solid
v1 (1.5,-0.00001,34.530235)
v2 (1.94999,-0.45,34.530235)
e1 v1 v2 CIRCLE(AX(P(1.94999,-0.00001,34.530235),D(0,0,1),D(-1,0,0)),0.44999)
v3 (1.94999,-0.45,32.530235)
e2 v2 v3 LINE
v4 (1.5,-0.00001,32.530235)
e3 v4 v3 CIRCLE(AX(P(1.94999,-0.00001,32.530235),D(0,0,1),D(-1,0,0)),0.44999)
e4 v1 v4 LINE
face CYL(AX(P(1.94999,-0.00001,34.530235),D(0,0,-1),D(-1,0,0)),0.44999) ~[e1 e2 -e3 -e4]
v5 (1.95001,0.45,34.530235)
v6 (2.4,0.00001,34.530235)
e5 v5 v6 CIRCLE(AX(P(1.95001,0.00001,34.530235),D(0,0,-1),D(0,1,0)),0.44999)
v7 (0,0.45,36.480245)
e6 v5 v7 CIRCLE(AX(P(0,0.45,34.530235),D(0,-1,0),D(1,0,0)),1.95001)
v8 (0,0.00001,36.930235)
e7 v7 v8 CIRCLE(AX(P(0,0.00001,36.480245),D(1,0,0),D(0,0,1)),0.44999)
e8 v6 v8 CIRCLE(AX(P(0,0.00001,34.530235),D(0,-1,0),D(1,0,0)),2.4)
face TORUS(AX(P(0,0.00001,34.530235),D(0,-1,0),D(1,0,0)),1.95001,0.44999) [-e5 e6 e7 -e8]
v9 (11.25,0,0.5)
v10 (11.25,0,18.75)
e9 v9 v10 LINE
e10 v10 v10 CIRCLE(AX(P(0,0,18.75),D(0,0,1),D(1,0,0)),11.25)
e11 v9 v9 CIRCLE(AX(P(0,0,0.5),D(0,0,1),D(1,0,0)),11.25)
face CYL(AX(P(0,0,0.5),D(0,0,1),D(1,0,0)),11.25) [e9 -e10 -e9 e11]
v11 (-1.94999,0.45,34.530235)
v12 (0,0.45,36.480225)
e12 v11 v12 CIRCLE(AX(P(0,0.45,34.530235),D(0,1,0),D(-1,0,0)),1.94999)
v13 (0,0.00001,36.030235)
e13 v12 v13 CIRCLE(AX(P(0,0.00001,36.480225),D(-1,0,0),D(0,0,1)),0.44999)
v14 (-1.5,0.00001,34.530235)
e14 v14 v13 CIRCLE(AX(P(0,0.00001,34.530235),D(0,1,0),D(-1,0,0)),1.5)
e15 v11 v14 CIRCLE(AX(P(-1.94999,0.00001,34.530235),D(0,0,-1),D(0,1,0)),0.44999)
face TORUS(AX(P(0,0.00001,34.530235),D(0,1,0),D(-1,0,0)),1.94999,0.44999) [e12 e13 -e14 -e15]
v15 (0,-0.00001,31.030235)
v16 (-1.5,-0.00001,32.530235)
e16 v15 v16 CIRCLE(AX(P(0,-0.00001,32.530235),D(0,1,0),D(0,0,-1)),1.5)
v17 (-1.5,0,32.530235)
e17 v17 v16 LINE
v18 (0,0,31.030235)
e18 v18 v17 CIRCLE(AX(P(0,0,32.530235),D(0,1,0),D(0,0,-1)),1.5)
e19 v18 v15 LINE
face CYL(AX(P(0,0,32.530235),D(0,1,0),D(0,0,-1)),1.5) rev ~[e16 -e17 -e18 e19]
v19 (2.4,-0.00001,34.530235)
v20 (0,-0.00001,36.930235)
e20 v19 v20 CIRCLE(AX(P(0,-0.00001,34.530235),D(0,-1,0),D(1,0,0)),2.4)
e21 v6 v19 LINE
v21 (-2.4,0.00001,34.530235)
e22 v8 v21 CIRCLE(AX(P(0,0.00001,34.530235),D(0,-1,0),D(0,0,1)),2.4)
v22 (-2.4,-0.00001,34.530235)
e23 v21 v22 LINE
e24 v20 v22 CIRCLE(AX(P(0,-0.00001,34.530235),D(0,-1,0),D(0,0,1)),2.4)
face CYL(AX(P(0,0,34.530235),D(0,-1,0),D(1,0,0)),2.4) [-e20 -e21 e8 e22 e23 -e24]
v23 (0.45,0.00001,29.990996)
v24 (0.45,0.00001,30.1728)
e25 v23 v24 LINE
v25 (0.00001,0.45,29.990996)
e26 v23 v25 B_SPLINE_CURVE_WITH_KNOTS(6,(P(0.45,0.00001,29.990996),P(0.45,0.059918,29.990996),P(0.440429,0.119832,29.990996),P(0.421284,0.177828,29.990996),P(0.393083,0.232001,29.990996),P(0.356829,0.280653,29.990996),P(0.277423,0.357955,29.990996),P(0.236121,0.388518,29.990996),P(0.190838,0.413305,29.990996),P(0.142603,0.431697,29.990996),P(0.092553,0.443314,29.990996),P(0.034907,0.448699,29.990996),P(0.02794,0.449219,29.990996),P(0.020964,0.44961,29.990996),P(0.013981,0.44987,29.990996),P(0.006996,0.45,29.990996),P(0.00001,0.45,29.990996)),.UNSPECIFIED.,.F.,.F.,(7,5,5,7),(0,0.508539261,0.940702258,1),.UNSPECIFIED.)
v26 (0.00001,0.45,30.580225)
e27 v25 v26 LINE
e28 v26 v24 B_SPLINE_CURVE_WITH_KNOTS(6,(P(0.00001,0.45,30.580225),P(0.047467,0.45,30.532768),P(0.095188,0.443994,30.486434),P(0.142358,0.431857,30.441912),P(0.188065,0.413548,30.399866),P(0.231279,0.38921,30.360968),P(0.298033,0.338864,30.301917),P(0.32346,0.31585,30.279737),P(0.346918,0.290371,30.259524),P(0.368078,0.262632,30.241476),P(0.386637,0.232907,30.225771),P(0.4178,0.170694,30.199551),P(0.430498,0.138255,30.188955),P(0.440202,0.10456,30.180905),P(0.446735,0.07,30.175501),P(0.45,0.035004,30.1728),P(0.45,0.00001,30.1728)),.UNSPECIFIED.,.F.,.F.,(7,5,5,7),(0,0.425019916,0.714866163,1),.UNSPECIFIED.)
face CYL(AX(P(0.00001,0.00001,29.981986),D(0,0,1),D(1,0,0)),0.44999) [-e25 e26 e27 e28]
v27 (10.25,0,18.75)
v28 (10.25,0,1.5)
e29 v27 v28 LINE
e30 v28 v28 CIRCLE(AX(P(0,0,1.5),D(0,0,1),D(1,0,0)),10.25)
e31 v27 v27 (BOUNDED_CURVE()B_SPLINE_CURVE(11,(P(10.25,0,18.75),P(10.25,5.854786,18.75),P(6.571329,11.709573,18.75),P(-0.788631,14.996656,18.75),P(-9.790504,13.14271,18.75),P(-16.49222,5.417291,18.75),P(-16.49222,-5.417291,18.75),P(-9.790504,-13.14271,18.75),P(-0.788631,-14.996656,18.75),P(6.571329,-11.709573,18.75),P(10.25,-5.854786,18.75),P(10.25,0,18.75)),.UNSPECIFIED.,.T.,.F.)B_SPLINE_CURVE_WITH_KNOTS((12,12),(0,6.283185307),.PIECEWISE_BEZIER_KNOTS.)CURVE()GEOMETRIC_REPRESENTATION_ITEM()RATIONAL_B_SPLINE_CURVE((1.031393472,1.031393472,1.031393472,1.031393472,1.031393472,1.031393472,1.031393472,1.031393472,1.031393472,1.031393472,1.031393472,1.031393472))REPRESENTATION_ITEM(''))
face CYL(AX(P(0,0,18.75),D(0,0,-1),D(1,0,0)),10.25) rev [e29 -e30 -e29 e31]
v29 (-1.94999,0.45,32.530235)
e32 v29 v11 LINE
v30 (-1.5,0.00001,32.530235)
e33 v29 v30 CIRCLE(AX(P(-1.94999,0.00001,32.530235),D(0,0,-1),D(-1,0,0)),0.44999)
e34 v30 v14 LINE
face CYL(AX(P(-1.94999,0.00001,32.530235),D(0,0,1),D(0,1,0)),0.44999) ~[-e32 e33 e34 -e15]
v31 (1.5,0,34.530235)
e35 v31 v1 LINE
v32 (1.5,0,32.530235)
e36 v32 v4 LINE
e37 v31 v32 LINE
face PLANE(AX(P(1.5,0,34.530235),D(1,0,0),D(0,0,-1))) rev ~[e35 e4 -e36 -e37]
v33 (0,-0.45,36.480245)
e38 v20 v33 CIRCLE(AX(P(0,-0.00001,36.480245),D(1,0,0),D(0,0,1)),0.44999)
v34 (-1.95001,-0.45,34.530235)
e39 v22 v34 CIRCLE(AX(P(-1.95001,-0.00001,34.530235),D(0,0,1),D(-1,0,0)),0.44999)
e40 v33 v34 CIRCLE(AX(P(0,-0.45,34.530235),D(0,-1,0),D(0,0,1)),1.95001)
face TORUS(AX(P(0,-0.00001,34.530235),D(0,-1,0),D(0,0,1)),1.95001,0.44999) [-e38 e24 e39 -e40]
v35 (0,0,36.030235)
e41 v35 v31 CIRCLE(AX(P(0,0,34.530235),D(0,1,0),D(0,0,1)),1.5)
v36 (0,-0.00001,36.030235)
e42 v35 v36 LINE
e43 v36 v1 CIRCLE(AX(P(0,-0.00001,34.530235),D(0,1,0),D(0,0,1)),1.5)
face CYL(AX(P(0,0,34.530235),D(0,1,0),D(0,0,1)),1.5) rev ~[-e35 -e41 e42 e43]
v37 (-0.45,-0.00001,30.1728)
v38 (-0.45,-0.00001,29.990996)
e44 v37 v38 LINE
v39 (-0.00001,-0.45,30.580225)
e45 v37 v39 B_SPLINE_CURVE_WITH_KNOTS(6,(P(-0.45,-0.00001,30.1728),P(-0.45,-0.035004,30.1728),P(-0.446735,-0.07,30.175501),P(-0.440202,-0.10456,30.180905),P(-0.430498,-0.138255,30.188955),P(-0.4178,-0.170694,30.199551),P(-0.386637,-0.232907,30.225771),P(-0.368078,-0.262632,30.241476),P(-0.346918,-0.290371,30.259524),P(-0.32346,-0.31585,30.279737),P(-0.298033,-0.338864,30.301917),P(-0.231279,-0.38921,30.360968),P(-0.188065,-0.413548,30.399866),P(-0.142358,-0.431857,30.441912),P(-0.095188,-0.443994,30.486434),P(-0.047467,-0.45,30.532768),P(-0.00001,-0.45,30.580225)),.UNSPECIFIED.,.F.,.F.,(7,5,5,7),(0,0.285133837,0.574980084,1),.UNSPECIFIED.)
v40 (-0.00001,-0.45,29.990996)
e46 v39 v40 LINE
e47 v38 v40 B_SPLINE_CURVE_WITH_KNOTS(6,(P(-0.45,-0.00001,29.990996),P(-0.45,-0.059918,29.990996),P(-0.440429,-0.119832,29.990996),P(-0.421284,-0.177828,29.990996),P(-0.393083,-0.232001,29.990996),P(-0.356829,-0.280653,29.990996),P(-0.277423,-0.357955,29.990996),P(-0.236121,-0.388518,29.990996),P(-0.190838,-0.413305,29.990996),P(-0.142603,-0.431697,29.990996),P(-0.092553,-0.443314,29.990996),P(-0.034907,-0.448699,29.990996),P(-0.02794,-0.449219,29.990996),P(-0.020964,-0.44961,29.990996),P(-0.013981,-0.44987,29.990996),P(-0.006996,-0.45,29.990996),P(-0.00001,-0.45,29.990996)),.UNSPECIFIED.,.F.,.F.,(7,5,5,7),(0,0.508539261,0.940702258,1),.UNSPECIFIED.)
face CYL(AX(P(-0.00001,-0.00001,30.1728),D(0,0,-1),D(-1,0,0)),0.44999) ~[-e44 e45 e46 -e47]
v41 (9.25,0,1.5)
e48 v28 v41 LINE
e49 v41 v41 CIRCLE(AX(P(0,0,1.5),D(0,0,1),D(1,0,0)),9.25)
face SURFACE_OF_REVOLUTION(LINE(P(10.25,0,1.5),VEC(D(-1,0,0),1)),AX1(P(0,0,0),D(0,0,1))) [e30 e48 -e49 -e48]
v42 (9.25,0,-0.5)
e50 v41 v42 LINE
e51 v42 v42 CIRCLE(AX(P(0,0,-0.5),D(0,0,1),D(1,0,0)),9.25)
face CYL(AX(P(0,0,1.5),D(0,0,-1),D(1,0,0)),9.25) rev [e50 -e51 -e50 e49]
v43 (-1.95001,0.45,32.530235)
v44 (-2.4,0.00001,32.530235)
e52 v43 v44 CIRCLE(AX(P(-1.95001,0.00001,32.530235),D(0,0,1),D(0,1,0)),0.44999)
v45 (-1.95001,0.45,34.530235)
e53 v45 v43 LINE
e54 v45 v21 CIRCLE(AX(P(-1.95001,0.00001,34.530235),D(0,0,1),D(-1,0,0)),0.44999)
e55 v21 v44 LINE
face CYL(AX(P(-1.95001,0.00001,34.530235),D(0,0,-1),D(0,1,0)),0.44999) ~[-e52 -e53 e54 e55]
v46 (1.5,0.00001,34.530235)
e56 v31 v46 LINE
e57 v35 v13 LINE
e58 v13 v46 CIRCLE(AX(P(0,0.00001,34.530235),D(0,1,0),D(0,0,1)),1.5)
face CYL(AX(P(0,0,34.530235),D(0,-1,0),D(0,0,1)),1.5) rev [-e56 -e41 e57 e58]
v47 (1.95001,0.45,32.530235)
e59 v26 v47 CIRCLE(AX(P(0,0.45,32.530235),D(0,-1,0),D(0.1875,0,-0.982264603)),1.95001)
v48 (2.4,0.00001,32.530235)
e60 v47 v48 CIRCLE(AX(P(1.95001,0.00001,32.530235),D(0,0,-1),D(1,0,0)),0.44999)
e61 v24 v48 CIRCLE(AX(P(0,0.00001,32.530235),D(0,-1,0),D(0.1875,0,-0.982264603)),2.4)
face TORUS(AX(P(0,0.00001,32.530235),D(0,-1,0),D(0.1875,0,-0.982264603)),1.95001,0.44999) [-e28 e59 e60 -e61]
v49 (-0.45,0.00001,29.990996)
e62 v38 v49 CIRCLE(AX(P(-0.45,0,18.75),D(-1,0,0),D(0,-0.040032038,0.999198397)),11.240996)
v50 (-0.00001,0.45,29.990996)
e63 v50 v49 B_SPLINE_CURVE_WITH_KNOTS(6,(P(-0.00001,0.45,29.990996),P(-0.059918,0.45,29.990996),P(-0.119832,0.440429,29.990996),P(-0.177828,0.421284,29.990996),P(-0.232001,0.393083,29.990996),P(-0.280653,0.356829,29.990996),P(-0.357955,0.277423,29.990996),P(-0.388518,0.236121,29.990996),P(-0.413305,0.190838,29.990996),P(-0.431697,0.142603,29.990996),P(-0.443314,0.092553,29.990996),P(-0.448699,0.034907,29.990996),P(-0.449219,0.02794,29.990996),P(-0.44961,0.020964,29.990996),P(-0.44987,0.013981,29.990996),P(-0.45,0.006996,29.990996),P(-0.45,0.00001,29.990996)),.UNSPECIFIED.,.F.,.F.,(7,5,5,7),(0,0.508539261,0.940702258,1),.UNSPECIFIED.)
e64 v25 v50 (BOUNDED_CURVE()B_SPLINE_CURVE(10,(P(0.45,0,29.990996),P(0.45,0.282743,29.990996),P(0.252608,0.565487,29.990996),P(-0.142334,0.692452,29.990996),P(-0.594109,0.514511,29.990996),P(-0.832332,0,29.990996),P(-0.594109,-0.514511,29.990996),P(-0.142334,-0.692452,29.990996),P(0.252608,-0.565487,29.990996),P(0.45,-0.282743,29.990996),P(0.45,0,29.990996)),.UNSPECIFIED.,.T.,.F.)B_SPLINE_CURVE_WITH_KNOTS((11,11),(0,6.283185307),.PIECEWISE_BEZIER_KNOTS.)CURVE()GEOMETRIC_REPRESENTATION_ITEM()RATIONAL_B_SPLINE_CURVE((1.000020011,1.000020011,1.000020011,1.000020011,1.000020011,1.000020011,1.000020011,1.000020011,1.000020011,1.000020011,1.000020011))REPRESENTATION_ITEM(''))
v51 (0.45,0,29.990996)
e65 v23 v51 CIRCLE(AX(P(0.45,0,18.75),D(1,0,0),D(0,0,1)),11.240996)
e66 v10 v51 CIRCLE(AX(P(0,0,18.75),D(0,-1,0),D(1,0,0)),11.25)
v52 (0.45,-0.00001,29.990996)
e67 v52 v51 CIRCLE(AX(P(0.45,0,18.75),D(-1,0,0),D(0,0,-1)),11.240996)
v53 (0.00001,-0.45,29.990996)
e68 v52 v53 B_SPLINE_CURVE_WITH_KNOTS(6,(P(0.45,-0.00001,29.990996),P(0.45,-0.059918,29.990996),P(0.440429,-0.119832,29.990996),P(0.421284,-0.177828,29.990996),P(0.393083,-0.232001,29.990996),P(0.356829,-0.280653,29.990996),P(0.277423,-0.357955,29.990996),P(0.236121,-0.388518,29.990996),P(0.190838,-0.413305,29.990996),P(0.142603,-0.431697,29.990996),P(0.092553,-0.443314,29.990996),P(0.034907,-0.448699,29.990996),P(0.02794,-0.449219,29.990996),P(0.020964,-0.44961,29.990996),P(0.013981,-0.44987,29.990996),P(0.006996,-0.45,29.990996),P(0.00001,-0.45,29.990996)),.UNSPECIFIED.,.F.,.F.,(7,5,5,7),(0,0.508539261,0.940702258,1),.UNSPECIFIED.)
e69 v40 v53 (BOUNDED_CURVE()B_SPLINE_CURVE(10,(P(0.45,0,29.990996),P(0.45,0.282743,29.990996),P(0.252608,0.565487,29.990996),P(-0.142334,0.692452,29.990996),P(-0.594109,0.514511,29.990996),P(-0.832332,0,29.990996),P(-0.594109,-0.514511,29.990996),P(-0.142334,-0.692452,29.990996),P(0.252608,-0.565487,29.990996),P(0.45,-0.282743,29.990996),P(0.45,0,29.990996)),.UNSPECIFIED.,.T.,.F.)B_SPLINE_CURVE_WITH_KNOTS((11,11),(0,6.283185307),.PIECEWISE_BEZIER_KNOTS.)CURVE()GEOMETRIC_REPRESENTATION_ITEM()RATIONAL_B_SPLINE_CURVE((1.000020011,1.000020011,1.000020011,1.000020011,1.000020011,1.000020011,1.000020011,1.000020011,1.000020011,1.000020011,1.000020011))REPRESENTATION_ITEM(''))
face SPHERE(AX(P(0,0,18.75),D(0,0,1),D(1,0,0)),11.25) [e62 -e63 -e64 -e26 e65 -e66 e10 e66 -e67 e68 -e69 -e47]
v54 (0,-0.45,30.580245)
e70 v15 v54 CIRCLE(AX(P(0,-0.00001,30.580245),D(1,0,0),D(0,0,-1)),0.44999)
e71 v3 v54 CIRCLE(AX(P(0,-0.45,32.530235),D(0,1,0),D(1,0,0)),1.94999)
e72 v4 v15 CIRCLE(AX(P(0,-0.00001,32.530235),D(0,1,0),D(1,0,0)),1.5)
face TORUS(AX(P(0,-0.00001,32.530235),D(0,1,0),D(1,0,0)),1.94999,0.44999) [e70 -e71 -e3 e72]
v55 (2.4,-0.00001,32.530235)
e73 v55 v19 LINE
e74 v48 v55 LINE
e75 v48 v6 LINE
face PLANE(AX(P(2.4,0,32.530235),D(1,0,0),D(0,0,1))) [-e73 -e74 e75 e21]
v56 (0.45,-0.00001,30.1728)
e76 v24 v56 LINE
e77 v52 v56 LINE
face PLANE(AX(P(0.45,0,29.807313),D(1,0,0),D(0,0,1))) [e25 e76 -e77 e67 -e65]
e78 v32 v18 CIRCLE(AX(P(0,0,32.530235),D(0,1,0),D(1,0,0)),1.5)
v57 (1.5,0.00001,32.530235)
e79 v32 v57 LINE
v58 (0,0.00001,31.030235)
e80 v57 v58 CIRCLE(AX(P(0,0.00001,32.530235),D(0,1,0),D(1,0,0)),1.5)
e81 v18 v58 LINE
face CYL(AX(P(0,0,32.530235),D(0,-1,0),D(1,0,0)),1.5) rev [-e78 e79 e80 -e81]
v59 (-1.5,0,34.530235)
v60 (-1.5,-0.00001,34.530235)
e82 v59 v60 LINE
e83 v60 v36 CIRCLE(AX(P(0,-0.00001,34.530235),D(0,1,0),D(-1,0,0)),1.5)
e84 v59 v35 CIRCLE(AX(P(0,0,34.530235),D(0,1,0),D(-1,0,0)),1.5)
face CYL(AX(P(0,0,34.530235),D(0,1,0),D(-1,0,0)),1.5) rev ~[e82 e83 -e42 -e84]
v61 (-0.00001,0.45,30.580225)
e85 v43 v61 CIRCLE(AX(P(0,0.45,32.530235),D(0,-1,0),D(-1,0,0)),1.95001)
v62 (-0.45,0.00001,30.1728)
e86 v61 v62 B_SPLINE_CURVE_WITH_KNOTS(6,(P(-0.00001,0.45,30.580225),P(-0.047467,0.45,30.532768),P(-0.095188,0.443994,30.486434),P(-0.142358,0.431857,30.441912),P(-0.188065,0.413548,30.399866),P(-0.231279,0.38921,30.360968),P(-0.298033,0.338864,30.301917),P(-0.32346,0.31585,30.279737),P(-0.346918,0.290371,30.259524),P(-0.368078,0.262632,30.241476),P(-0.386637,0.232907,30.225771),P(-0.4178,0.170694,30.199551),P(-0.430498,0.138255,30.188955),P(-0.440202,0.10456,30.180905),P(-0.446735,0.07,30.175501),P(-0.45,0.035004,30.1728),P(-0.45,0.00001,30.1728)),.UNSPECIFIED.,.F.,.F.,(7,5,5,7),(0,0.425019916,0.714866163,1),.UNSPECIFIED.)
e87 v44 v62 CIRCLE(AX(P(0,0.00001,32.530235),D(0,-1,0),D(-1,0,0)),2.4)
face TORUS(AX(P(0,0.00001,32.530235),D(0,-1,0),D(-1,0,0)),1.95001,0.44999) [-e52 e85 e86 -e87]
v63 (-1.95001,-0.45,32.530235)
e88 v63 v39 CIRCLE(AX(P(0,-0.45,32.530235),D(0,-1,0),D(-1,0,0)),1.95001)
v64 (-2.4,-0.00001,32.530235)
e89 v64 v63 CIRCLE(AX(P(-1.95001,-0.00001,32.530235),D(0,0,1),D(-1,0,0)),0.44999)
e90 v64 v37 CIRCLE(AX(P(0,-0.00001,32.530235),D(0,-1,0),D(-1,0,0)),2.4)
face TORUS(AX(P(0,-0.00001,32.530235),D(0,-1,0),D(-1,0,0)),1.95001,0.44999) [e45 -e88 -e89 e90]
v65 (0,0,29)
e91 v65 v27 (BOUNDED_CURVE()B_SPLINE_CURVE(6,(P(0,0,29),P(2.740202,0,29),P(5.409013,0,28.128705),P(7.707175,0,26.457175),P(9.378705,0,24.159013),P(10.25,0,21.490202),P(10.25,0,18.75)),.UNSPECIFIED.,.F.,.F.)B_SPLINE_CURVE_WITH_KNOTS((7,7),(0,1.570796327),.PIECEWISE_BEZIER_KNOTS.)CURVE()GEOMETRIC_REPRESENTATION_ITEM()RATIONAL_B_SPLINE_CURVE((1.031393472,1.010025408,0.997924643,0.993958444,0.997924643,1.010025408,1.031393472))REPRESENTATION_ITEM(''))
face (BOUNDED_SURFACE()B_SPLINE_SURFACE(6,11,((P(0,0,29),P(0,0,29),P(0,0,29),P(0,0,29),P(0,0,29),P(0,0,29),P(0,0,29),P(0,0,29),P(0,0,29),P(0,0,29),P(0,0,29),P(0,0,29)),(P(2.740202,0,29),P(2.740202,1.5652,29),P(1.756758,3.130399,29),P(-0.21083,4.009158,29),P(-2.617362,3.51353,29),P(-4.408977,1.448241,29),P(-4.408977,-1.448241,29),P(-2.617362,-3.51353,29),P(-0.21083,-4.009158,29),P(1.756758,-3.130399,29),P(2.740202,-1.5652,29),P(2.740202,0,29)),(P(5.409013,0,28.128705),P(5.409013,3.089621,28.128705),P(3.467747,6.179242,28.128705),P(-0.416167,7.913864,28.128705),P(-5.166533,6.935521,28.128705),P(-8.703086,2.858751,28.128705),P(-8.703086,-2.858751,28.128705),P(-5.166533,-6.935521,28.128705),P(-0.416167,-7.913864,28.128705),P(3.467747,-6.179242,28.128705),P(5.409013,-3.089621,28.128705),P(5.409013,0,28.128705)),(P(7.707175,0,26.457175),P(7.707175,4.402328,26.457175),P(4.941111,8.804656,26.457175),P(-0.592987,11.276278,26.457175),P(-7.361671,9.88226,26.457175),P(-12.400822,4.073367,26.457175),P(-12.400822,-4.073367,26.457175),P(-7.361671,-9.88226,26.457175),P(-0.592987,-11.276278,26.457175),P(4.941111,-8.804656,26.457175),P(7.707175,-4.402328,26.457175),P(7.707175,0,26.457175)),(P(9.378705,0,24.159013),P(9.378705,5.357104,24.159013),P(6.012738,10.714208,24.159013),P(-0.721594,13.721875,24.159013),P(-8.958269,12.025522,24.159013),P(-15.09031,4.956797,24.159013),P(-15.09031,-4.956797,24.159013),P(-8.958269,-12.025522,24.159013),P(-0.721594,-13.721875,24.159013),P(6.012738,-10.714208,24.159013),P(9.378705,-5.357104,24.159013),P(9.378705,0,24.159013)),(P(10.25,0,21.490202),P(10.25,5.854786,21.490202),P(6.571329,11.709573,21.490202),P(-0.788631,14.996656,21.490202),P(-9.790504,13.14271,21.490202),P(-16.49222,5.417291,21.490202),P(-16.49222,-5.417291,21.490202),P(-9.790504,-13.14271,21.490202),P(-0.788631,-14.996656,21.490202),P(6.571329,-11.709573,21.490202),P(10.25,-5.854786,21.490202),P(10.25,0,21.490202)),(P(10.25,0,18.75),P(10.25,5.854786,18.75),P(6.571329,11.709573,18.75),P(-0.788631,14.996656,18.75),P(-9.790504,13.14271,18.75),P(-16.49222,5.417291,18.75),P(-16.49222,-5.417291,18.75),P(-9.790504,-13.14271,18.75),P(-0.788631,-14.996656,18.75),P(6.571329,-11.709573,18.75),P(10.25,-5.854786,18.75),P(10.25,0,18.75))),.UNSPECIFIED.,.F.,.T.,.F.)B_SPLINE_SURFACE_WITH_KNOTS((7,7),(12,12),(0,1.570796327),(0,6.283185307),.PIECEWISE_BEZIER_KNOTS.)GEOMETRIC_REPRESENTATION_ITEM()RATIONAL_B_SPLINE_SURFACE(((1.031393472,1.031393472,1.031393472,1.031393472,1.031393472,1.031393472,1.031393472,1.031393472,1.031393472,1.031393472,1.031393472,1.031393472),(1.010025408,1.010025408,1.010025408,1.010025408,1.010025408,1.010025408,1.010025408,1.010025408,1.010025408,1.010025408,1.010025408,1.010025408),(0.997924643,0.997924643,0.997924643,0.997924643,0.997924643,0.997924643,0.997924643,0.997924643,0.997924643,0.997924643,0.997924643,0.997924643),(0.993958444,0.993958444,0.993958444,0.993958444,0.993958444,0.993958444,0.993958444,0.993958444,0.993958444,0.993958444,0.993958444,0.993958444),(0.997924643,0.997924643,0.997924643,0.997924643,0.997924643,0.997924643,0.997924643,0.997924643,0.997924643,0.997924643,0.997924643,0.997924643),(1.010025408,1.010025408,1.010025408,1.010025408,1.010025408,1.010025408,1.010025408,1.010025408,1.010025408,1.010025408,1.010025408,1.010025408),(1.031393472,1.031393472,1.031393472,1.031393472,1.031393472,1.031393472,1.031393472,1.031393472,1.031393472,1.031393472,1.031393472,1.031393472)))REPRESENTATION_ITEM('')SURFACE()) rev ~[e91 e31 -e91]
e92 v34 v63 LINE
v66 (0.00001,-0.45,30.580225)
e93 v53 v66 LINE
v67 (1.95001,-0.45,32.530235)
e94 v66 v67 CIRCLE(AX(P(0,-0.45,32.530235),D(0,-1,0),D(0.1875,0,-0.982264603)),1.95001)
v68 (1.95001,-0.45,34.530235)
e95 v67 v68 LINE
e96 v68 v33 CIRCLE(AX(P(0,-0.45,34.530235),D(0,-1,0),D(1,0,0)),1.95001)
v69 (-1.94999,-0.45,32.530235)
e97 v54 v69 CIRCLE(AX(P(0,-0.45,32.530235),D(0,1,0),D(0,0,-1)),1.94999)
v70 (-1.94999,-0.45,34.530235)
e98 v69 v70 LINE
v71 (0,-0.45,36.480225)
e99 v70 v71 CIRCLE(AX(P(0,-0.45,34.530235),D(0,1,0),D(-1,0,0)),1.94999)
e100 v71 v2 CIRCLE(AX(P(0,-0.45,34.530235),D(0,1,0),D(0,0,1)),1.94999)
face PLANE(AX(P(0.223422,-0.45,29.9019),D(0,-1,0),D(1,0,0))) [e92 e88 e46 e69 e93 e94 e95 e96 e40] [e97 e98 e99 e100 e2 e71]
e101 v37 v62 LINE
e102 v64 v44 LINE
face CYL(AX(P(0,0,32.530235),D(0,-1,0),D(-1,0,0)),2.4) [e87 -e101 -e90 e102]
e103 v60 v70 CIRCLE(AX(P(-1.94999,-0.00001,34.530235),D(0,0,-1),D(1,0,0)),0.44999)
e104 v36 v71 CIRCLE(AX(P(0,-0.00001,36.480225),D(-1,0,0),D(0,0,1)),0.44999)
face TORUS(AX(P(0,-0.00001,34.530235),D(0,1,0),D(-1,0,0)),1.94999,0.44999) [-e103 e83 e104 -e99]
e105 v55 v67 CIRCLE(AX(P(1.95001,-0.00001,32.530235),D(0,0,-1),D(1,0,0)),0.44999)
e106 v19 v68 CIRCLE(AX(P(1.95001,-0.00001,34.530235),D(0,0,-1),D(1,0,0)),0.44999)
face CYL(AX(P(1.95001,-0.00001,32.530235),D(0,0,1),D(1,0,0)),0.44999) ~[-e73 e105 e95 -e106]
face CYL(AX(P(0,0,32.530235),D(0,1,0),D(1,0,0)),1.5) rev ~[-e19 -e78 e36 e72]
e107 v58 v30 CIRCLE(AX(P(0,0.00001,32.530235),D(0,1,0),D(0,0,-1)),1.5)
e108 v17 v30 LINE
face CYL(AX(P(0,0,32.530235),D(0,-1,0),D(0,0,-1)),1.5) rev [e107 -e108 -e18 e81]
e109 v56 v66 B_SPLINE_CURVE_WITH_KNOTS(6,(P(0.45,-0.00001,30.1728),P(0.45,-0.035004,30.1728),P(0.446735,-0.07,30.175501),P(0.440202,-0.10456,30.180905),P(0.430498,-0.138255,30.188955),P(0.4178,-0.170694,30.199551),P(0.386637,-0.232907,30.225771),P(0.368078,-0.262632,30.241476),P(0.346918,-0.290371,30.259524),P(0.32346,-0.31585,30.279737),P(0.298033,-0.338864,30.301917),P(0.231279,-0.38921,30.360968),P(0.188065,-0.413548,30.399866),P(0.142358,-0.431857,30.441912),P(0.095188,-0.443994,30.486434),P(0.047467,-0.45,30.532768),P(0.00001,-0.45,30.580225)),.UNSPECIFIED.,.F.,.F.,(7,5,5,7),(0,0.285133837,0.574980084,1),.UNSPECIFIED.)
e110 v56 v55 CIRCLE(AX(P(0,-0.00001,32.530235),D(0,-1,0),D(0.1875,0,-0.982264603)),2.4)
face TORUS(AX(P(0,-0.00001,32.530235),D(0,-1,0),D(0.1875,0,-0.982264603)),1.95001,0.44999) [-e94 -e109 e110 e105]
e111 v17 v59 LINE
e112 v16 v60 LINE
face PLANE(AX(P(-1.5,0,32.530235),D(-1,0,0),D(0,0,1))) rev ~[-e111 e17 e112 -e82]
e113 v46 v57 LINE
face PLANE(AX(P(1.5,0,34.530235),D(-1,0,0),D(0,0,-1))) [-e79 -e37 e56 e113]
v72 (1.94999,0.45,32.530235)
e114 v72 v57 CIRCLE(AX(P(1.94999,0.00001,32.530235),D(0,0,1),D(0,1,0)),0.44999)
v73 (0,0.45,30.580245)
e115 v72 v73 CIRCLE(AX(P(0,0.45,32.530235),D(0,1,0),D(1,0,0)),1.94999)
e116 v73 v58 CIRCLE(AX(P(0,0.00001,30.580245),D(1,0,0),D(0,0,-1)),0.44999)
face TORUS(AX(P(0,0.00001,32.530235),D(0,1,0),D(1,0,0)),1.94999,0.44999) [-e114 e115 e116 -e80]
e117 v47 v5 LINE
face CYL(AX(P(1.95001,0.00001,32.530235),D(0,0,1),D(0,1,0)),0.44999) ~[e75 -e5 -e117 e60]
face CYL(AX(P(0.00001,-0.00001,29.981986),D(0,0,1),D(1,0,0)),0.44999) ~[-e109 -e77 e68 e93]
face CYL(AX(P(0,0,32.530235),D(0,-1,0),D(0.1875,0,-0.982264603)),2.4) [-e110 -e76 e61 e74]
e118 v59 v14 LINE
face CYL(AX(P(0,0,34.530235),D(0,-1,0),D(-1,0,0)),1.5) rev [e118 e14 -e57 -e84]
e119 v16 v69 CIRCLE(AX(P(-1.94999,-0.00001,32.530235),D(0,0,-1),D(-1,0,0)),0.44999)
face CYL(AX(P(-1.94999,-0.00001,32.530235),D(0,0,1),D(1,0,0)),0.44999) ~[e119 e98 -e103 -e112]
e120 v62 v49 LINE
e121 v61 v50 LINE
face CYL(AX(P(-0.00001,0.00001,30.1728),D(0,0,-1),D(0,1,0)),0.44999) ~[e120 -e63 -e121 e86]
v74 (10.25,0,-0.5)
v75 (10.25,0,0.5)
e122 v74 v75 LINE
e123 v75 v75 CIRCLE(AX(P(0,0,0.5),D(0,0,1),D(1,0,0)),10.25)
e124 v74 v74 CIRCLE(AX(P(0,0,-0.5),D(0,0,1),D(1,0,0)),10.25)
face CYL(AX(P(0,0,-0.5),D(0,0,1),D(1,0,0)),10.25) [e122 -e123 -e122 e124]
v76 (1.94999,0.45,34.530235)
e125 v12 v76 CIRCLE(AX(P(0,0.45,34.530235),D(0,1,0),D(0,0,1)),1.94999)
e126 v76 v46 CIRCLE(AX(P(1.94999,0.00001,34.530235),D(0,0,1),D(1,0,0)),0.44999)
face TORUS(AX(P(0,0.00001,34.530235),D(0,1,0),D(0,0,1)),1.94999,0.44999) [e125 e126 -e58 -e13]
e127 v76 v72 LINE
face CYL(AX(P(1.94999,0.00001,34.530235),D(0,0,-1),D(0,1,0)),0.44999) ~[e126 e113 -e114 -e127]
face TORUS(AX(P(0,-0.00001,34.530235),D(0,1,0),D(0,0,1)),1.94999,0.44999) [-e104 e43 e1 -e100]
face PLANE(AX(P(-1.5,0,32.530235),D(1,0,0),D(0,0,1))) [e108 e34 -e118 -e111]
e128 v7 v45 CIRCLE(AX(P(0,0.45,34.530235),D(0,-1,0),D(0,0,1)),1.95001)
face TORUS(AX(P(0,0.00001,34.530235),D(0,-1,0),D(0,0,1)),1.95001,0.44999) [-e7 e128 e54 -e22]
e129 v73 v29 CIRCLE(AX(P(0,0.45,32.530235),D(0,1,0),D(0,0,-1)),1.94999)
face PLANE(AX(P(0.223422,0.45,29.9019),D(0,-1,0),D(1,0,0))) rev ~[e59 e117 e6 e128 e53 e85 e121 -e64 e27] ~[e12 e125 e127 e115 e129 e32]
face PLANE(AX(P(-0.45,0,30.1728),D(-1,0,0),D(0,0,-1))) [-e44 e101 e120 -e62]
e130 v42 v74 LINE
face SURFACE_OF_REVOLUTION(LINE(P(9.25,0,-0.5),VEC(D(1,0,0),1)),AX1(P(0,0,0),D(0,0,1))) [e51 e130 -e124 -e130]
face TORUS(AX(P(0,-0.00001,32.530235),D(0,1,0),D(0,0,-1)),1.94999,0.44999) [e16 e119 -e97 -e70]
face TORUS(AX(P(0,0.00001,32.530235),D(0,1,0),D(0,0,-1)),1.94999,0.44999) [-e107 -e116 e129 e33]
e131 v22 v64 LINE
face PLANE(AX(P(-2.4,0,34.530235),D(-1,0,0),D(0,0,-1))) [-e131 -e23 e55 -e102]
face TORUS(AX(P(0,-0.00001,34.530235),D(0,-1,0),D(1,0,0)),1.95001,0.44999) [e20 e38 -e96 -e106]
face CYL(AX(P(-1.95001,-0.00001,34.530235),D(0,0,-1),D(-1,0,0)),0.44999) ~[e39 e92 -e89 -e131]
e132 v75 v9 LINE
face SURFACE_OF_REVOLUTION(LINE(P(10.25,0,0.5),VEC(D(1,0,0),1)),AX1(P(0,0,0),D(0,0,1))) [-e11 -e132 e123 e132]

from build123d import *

# Parameters (mm, degrees)
F3_DEPTH      = 0.45
F3_DEPTH_BACK = 0.45
F4_R          = 0.44999


# Not quite as in the source:
# - a fillet or chamfer is up to 0.001 mm smaller than in the source, because OpenCascade refuses the exact size


with BuildPart() as f2:
    # F2: sweep along a path in F1
    with BuildLine(Plane.XY) as f2_path:
        CenterArc((0, 0), 11.25, 0, 360)
    # F0 (on Front) → F2 (sweep)
    with BuildSketch(Plane.XZ):
        with BuildLine():
            Line((0.45, 29.8073129207), (0.45, 29.9909963971))
            ThreePointArc((0.45, 29.9909963971), (0.2250450315, 29.9977488741), (0, 30))
            Line((0, 30), (0, 29.8073129207))
            Line((0, 29.8073129207), (0.45, 29.8073129207))
        make_face()
        with BuildLine():
            Line((11.25, 0.5), (11.25, 18.75))
            ThreePointArc((11.25, 18.75), (8.1124903698, 26.5442286341), (0.45, 29.9909963971))
            Line((0.45, 29.9909963971), (0.45, 29.8073129207))
            Line((0.45, 29.8073129207), (0, 29.8073129207))
            Line((0, 29.8073129207), (0, 29))
            ThreePointArc((0, 29), (7.2478445072, 25.9978445072), (10.25, 18.75))
            Line((10.25, 18.75), (10.25, 1.5))
            Line((10.25, 1.5), (9.25, 1.5))
            Line((9.25, 1.5), (9.25, -0.5))
            Line((9.25, -0.5), (10.25, -0.5))
            Line((10.25, -0.5), (10.25, 0))
            Line((10.25, 0), (10.25, 0.5))
            Line((10.25, 0.5), (11.25, 0.5))
        make_face()
    sweep(path=f2_path.line)

    # F0 (on Front) → F3 (join, two sides)
    with BuildSketch(Plane.XZ) as f3_sk:
        with BuildLine():
            Line((0.45, 29.8073129207), (0.45, 29.9909963971))
            ThreePointArc((0.45, 29.9909963971), (0.2250450315, 29.9977488741), (0, 30))
            Line((0, 30), (0, 29.8073129207))
            Line((0, 29.8073129207), (0.45, 29.8073129207))
        make_face()
        with BuildLine():
            Line((0.45, 30.3073129207), (0.45, 30.1728002437))
            ThreePointArc((0.45, 30.1728002437), (1.8493242009, 31.0005294364), (2.4, 32.5302352905))
            Line((2.4, 32.5302352905), (2.4, 34.5302352905))
            ThreePointArc((2.4, 34.5302352905), (1.6970562748, 36.2272915654), (0, 36.9302352905))
            ThreePointArc((0, 36.9302352905), (-1.6970562748, 36.2272915654), (-2.4, 34.5302352905))
            Line((-2.4, 34.5302352905), (-2.4, 32.5302352905))
            ThreePointArc((-2.4, 32.5302352905), (-1.8493242009, 31.0005294364), (-0.45, 30.1728002437))
            Line((-0.45, 30.1728002437), (-0.45, 30.3073129207))
            Line((-0.45, 30.3073129207), (0.45, 30.3073129207))
        make_face()
        with BuildLine():
            Line((1.5, 34.5302352905), (1.5, 32.5302352905))
            ThreePointArc((1.5, 32.5302352905), (1.0606601718, 31.4695751187), (0, 31.0302352905))
            ThreePointArc((0, 31.0302352905), (-1.0606601718, 31.4695751187), (-1.5, 32.5302352905))
            Line((-1.5, 32.5302352905), (-1.5, 34.5302352905))
            ThreePointArc((-1.5, 34.5302352905), (-1.0606601718, 35.5908954623), (0, 36.0302352905))
            ThreePointArc((0, 36.0302352905), (1.0606601718, 35.5908954623), (1.5, 34.5302352905))
        make_face(mode=Mode.SUBTRACT)
        with BuildLine():
            ThreePointArc((0, 30.1302352905), (0.2260043004, 30.1409002248), (0.45, 30.1728002437))
            Line((0.45, 30.1728002437), (0.45, 30.3073129207))
            Line((0.45, 30.3073129207), (-0.45, 30.3073129207))
            Line((-0.45, 30.3073129207), (-0.45, 30.1728002437))
            ThreePointArc((-0.45, 30.1728002437), (-0.2260043004, 30.1409002248), (0, 30.1302352905))
        make_face()
        with BuildLine():
            ThreePointArc((0, 30), (0.2250450315, 29.9977488741), (0.45, 29.9909963971))
            Line((0.45, 29.9909963971), (0.45, 30.1728002437))
            ThreePointArc((0.45, 30.1728002437), (0.2260043004, 30.1409002248), (0, 30.1302352905))
            ThreePointArc((0, 30.1302352905), (-0.2260043004, 30.1409002248), (-0.45, 30.1728002437))
            Line((-0.45, 30.1728002437), (-0.45, 29.8073129207))
            Line((-0.45, 29.8073129207), (0, 29.8073129207))
            Line((0, 29.8073129207), (0, 30))
        make_face()
    extrude(amount=F3_DEPTH)
    extrude(f3_sk.sketch, amount=-F3_DEPTH_BACK)

    # F4 (radius 0.45 in the source; OpenCascade refuses exactly that, so slightly less here)
    f4_edges = [f2.edges().sort_by_distance(p)[0] for p in [
        (0, -0.45, 31.030235),
        (0, 0.45, 31.030235),
        (0, -0.45, 36.930235),
        (0, 0.45, 36.930235),
        (0.45, -0.45, 30.077393),
        (0.45, 0.45, 30.077393),
        (-0.45, -0.45, 30.077393),
        (-0.45, 0.45, 30.077393),
        (-1.849324, 0.45, 31.000529),
        (-2.4, 0.45, 33.530235),
        (2.4, 0.45, 33.530235),
        (1.849324, 0.45, 31.000529),
        (1.5, 0.45, 33.530235),
        (-1.5, 0.45, 33.530235),
        (0, 0.45, 36.030235),
        (-1.849324, -0.45, 31.000529),
        (-2.4, -0.45, 33.530235),
        (2.4, -0.45, 33.530235),
        (1.849324, -0.45, 31.000529),
        (1.5, -0.45, 33.530235),
        (-1.5, -0.45, 33.530235),
        (0, -0.45, 36.030235),
    ]]
    fillet(f4_edges, radius=F4_R)


solid = f2.part
